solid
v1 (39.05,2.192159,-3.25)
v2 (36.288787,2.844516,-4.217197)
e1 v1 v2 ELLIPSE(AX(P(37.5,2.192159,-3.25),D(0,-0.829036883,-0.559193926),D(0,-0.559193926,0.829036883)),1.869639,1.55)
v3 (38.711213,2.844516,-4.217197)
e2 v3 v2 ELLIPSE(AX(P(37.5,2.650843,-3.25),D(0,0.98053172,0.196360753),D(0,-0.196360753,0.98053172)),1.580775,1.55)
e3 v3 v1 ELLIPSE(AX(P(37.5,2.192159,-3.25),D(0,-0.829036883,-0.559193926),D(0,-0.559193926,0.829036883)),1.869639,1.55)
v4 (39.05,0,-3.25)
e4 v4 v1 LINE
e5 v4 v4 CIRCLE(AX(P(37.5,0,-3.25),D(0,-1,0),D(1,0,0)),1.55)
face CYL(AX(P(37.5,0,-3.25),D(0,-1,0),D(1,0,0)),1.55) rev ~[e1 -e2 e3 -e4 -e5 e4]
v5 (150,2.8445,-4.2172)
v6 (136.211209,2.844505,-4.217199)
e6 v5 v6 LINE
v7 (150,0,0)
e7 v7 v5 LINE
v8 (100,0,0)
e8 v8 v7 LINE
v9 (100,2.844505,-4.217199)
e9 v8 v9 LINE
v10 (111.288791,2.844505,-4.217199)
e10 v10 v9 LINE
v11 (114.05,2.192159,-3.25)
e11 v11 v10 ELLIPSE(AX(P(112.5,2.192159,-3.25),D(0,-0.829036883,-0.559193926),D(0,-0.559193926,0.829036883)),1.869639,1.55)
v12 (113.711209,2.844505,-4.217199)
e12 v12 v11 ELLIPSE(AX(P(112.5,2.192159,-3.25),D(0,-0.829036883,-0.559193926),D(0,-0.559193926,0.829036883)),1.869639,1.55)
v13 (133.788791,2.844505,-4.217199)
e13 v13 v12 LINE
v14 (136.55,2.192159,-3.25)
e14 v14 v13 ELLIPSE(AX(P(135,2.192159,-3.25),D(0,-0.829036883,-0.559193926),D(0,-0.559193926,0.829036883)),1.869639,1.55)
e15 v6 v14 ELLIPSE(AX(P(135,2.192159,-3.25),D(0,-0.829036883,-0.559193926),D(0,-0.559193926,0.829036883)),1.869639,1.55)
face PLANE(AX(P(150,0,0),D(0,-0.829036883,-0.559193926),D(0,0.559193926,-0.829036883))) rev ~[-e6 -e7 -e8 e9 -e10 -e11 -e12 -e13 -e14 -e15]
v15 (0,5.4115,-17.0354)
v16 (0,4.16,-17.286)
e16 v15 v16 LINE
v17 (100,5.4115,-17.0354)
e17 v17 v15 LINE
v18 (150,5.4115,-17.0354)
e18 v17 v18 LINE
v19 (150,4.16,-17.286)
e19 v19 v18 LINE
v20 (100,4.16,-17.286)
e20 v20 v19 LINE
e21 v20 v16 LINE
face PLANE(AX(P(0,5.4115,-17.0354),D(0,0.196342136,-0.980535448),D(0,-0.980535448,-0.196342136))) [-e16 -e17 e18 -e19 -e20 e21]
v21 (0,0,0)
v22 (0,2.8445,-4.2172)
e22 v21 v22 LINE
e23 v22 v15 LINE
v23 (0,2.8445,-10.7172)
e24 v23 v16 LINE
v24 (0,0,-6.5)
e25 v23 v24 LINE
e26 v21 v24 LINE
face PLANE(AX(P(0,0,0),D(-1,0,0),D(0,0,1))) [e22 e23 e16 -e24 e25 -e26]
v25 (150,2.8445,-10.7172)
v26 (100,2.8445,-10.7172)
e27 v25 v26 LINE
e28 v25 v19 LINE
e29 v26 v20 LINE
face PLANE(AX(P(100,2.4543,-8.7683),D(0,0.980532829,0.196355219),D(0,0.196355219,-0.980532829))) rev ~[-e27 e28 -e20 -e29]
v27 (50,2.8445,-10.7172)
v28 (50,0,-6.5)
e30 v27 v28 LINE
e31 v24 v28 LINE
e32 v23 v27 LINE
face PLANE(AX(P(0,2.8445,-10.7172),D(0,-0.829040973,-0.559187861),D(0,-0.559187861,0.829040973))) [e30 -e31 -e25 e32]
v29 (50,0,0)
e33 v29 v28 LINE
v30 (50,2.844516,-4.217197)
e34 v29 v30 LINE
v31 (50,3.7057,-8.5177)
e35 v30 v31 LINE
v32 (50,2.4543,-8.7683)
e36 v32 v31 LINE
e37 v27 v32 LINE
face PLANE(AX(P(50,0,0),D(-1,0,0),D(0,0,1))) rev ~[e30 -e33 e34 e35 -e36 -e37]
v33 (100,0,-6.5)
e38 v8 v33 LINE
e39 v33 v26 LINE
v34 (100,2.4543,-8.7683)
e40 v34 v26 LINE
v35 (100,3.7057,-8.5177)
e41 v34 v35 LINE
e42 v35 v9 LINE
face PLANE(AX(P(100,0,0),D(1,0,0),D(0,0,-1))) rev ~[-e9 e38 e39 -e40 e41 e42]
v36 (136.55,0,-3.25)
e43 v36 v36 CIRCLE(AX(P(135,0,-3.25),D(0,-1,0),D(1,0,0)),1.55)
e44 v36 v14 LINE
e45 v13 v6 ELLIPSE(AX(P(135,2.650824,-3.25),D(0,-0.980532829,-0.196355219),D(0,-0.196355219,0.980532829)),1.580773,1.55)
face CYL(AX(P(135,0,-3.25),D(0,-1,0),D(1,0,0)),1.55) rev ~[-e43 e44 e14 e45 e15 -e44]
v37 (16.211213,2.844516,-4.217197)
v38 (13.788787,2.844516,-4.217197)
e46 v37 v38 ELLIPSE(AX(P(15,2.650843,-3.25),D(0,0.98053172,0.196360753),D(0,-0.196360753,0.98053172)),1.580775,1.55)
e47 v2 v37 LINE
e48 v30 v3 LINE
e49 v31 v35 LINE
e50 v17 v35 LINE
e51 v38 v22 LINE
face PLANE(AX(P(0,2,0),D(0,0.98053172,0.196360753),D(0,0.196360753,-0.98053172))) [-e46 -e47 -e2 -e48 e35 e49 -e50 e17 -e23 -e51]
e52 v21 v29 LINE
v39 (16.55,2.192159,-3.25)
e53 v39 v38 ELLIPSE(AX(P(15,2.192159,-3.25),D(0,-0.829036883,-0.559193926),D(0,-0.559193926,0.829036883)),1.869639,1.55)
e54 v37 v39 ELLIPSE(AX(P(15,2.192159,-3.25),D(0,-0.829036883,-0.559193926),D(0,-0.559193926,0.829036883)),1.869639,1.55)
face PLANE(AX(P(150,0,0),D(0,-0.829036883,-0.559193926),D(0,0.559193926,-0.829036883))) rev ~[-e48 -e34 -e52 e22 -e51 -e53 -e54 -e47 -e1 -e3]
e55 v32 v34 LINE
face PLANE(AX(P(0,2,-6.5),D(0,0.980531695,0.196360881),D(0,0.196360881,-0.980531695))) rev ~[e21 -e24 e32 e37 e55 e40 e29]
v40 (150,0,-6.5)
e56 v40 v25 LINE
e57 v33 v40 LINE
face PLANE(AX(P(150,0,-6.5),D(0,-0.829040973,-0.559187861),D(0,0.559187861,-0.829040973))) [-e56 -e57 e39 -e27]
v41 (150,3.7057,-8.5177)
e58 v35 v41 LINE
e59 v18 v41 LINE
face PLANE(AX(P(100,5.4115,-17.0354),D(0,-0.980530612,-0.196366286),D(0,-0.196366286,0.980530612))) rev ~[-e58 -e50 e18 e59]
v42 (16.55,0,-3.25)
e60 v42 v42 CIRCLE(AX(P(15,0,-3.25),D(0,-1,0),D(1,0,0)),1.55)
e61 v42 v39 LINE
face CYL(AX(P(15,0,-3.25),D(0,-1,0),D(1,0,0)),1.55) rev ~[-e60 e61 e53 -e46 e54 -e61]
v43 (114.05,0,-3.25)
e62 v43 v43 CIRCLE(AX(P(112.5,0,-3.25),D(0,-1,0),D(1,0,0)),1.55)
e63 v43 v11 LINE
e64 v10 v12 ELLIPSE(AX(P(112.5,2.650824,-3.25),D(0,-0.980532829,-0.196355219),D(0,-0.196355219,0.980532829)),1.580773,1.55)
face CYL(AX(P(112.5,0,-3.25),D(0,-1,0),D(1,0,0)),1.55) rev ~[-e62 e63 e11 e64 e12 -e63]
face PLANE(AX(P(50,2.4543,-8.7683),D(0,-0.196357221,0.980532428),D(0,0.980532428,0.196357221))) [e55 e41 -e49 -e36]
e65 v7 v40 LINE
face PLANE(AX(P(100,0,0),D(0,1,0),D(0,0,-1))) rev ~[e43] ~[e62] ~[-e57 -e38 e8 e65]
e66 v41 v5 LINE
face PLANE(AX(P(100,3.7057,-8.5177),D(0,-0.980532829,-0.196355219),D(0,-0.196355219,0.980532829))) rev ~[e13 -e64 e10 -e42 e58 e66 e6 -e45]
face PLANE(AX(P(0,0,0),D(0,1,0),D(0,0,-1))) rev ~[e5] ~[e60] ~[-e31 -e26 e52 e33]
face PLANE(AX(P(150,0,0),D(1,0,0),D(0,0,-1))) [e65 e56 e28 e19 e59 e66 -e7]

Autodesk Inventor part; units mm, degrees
ref_plane "YZ Plane" through (0, 0, 0) normal (1, 0, 0) x (0, 1, 0)
ref_plane "XZ Plane" through (0, 0, 0) normal (0, 1, 0) x (-1, 0, 0)
ref_plane "XY Plane" through (0, 0, 0) normal (0, 0, 1) x (1, 0, 0)
sketch "Sketch1" plane through (0, 0, 0) normal (1, 0, 0) x (0, 1, 0)
  line L0 (0, 0) -> (0, -6.5)
  line L1 (0, -6.5) -> (2, -6.5)
  line L2 (2, -6.5) -> (4.16, -17.286)
  line L3 (0, 0) -> (2, 0)
  line L4 (2, 0) -> (5.4115, -17.0354)
  line L5 (5.4115, -17.0354) -> (4.16, -17.286)
  dimension "d0" = 6.5
  dimension "d1" = 2
  dimension "d2" = 10.786
  dimension "d3" = 2.16
extrude "Extrusion1" add sketch "Sketch1" along normal blind 50
sketch "Sketch2" plane through (50, 0, 0) normal (1, 0, 0) x (0, 0, -1)
  line L0 (0, 0) -> (6.5, 0) projected
  line L1 (6.5, 0) -> (6.5, 2) projected
  line L2 (6.5, 2) -> (17.286, 4.16) projected
  line L3 (17.286, 4.16) -> (17.0354, 5.4115) projected
  line L4 (17.0354, 5.4115) -> (0, 2) projected
  line L5 (0, 2) -> (0, 0) projected
  line L6 (8.7683, 2.4543) -> (8.5177, 3.7057)
extrude "Extrusion2" add sketch "Sketch2" along normal blind 50 contours L4 L3 L2 L6
sketch "Sketch3" plane through (100, 0, 0) normal (1, 0, 0) x (0, 0, -1)
  line L0 (8.7683, 2.4543) -> (8.5177, 3.7057) projected
  line L1 (8.5177, 3.7057) -> (0, 2) projected
  line L2 (0, 2) -> (0, 0) projected
  line L3 (0, 0) -> (6.5, 0) projected
  line L4 (6.5, 0) -> (6.5, 2) projected
  line L5 (6.5, 2) -> (8.7683, 2.4543) projected
  line L6 (17.0354, 5.4115) -> (8.5177, 3.7057) projected
  line L7 (8.5177, 3.7057) -> (8.7683, 2.4543) projected
  line L8 (8.7683, 2.4543) -> (17.286, 4.16) projected
  line L9 (17.286, 4.16) -> (17.0354, 5.4115) projected
extrude "Extrusion3" add sketch "Sketch3" along normal blind 50
sketch "Sketch4" plane through (100, 0, -6.5) normal (0, -1, 0) x (1, 0, 0)
  circle A0 centre (-85, 3.25) radius 1.55
  circle A1 centre (-62.5, 3.25) radius 1.55
  line L0 (-100, 6.5) -> (-100, 0) projected
  line L1 (-100, 6.5) -> (-50, 6.5) projected
  circle A2 centre (35, 3.25) radius 1.55
  circle A3 centre (12.5, 3.25) radius 1.55
  line L2 (0, 6.5) -> (50, 6.5) projected
  line L3 (50, 6.5) -> (50, 0) projected
  point P0 (-100, 3.25)
  dimension "d10" = 37.5
  dimension "d11" = 15
  dimension "d12" = 3.25
  dimension "d13" = 3.1
  dimension "d14" = 3.25
  dimension "d15" = 3.1
  dimension "d16" = 3.1
  dimension "d17" = 3.1
  dimension "d18" = 3.25
  dimension "d19" = 3.25
  dimension "d20" = 15
  dimension "d21" = 37.5
extrude "Extrusion4" cut sketch "Sketch4" against normal blind 3
sketch "Sketch5" plane through (150, 0, 0) normal (1, 0, 0) x (0, 0, -1)
  line L0 (0, 0) -> (13.9221, 9.3906)
  line L1 (0, 0) -> (16.7931, 0) construction
  line L2 (0, 0) -> (4.2172, 2.8445)
  line L3 (1.7, 2.3404) -> (4.8, 2.9612) projected
  line L4 (17.0354, 5.4115) -> (0, 2) projected
  line L5 (0, 2) -> (4.2172, 2.8445)
  line L6 (0, 2) -> (0, 0)
  dimension "d24" = 34
extrude "Extrusion5" cut sketch "Sketch5" against normal blind 150
sketch "Sketch6" plane through (150, 0, 0) normal (1, 0, 0) x (0, 0, -1)
  line L0 (0, 0) -> (6.5, 0) projected
  line L1 (6.5, 0) -> (10.7172, 2.8445)
  line L2 (6.5, 2) -> (8.7683, 2.4543) projected
  line L3 (4.2172, 2.8445) -> (0, 0) projected
  line L4 (6.5, 0) -> (6.5, 2)
  line L5 (10.7172, 2.8445) -> (6.5, 2)
extrude "Extrusion6" add sketch "Sketch6" against normal blind 50
sketch "Sketch7" plane through (0, 0, 0) normal (-1, 0, 0) x (0, 0, 1)
  line L0 (0, 0) -> (-4.2172, 2.8445) projected
  line L1 (-8.5177, 3.7057) -> (-4.2172, 2.8445) projected
  line L2 (-8.5177, 3.7057) -> (-8.7683, 2.4543) projected
  line L3 (-10.7172, 2.8445) -> (-8.7683, 2.4543) projected
  line L4 (-10.7172, 2.8445) -> (-6.5, 0) projected
  line L5 (0, 0) -> (-6.5, 0) projected
  line L6 (-6.5, 2) -> (-17.286, 4.16) projected
  line L7 (-6.5, 0) -> (-6.5, 2) projected
  line L8 (-10.7172, 2.8445) -> (-6.5, 0) projected
extrude "Extrusion7" add sketch "Sketch7" against normal blind 50 contours L4 L3 L6 L7
properties part number "przod"
